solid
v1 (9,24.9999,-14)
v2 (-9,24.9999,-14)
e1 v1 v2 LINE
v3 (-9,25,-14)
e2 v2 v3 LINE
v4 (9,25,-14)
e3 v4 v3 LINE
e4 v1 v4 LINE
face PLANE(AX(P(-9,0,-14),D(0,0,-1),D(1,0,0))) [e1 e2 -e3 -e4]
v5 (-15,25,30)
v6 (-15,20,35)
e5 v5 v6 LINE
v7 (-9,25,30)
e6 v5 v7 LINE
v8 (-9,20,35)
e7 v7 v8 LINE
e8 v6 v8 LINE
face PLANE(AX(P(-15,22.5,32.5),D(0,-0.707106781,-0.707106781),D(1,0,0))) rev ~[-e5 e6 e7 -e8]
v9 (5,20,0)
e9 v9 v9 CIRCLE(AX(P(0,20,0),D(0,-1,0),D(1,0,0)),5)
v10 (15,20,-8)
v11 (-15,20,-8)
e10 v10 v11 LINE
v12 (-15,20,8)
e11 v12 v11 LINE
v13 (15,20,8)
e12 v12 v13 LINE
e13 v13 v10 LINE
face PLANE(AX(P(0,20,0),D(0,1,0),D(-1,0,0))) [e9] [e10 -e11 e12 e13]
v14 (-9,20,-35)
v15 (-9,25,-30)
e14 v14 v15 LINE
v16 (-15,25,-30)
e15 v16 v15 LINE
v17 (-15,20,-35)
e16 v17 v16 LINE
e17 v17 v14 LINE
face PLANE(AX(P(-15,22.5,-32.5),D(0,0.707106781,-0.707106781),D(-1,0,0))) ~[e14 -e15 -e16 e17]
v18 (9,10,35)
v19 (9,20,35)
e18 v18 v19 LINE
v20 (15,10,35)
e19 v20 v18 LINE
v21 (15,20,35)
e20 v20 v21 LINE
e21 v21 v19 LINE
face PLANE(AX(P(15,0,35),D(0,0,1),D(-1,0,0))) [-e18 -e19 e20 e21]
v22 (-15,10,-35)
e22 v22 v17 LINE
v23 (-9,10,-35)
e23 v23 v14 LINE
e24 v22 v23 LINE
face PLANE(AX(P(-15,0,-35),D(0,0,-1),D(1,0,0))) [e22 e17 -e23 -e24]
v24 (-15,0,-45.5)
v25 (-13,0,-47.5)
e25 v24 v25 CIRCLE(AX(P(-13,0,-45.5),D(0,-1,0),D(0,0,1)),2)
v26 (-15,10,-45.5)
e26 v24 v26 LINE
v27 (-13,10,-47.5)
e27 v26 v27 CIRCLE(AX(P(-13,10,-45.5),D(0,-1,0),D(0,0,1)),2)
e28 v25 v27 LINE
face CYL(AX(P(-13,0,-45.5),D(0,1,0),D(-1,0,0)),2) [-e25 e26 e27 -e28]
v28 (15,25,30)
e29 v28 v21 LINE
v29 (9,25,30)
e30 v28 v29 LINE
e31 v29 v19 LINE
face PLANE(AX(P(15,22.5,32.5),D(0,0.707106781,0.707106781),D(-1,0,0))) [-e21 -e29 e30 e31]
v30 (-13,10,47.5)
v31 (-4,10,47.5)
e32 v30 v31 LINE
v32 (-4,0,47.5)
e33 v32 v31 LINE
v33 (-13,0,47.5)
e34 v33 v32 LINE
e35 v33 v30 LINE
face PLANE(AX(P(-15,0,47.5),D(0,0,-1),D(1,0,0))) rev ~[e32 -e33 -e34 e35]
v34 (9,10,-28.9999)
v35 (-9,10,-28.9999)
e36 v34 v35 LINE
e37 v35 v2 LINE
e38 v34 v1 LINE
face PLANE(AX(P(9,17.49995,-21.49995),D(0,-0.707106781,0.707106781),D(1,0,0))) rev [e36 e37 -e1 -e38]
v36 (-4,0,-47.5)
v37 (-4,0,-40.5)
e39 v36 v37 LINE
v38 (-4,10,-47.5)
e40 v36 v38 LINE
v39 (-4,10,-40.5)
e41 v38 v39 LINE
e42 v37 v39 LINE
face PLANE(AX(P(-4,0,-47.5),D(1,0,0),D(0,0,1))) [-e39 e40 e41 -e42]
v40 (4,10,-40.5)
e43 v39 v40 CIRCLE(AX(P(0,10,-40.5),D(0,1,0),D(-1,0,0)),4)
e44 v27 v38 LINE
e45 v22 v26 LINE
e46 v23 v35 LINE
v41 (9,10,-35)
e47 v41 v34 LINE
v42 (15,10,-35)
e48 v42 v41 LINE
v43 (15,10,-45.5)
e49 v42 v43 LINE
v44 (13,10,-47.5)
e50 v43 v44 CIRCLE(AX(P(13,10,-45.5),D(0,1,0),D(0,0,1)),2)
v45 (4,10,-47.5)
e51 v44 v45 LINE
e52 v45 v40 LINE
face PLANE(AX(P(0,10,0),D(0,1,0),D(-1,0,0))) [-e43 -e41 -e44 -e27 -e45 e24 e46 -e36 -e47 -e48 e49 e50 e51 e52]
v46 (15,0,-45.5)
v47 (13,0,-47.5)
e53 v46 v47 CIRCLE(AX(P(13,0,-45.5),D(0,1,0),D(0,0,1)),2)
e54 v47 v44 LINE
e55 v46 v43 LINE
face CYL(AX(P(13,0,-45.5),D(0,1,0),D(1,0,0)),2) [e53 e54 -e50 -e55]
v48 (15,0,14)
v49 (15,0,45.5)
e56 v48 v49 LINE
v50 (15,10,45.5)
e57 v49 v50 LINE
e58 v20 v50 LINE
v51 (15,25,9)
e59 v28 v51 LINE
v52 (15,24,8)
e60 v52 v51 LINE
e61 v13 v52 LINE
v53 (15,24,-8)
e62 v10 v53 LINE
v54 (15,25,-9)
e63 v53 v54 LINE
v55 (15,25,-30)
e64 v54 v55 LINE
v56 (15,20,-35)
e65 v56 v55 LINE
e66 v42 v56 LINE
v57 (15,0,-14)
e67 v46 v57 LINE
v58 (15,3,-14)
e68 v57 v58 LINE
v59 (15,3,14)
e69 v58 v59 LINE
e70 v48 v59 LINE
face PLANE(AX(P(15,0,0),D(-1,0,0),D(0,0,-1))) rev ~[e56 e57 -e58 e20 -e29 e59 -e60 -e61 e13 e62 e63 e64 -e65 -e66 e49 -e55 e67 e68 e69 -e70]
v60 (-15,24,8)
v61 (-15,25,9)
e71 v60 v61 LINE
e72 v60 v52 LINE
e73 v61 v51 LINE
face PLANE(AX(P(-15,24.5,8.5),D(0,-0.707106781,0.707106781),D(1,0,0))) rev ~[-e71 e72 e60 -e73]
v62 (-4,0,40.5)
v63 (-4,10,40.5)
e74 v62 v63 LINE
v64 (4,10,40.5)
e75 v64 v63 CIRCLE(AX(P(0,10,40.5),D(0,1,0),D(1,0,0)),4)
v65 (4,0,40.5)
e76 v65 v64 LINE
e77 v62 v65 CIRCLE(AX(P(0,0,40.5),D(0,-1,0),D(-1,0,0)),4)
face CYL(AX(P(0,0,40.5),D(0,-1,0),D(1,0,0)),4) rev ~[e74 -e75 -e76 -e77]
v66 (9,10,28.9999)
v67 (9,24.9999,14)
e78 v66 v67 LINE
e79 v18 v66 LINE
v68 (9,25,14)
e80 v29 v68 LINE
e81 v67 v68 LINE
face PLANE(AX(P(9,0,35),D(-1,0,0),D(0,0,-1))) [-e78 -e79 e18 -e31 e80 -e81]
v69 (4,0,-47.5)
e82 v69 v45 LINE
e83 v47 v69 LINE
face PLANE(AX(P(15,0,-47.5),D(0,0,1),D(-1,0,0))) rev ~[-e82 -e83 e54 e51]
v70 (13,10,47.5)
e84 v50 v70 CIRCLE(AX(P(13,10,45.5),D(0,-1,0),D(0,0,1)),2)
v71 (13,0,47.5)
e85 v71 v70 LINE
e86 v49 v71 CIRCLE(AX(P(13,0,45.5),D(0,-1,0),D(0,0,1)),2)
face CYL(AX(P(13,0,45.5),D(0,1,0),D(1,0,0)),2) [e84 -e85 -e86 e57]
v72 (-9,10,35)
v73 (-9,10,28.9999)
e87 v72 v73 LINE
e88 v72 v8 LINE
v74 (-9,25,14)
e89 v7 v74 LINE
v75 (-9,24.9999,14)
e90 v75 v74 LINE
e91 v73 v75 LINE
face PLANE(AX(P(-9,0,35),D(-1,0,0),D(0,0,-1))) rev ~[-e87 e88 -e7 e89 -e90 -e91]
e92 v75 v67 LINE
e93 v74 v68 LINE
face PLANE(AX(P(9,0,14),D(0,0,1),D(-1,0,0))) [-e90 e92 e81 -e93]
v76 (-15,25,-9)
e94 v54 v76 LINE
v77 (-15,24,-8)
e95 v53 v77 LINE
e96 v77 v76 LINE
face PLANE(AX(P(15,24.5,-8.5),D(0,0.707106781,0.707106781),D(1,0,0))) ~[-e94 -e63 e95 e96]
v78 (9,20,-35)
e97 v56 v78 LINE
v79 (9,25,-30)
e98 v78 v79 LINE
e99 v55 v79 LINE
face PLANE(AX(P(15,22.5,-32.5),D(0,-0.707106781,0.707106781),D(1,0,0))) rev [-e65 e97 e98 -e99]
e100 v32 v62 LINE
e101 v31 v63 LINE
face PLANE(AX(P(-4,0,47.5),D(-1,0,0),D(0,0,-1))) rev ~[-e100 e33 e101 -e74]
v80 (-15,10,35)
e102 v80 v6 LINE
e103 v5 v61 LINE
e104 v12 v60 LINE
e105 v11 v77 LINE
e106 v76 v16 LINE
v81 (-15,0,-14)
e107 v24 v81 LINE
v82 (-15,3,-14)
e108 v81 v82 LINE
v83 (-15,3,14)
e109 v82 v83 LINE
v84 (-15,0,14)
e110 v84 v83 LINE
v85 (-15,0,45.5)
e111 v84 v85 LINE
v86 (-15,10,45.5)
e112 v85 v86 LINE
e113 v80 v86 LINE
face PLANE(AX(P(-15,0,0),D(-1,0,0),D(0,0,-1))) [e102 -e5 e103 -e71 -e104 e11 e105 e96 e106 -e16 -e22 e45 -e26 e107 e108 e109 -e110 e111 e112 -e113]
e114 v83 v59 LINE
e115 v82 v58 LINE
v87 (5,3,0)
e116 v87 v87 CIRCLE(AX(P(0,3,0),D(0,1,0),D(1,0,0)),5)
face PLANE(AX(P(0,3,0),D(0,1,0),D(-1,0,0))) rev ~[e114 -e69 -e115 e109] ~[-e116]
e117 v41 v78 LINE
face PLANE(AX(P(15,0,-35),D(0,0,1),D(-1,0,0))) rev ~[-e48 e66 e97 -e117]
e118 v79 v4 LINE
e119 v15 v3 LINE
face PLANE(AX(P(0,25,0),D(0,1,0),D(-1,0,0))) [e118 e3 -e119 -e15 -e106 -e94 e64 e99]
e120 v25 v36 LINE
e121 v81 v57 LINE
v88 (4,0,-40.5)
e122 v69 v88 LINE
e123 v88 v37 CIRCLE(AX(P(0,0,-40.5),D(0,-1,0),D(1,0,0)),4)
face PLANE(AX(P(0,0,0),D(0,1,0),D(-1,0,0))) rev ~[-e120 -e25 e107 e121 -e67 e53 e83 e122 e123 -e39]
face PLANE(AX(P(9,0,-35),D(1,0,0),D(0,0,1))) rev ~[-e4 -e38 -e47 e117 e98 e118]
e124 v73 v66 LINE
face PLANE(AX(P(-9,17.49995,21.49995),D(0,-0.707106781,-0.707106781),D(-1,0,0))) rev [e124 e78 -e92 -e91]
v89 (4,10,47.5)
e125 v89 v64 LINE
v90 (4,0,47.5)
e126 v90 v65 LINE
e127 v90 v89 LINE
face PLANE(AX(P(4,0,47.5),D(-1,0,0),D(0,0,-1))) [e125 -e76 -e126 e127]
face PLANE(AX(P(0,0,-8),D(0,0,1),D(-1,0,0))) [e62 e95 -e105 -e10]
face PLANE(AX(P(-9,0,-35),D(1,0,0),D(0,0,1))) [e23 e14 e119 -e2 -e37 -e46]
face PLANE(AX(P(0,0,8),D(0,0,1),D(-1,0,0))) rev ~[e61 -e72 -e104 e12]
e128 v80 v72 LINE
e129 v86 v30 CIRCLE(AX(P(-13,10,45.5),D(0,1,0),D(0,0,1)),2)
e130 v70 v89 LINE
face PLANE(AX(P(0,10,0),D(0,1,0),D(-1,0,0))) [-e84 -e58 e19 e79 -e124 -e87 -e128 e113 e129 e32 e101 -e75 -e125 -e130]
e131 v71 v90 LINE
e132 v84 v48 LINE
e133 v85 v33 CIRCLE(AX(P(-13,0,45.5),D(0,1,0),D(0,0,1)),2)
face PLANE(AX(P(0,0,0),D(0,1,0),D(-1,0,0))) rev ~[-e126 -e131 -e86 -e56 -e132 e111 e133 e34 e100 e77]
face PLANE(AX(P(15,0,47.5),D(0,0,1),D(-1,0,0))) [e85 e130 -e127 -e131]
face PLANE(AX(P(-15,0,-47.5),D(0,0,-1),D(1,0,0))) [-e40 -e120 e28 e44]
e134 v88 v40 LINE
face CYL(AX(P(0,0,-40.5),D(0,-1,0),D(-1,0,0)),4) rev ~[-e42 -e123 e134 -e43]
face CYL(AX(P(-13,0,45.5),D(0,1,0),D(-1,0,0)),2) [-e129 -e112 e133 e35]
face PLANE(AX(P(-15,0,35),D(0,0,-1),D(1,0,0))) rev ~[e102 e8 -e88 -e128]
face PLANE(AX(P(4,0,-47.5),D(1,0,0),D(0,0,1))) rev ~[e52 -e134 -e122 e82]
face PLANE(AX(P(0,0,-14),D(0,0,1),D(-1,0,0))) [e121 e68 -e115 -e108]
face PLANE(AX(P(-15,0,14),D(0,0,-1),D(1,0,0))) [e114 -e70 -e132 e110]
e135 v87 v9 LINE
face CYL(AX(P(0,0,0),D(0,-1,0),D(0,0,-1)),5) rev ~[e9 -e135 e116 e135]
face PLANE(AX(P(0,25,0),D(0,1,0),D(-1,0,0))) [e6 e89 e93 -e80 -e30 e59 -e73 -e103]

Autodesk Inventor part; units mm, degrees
ref_plane "YZ Plane" through (0, 0, 0) normal (1, 0, 0) x (0, 1, 0)
ref_plane "XZ Plane" through (0, 0, 0) normal (0, 1, 0) x (-1, 0, 0)
ref_plane "XY Plane" through (0, 0, 0) normal (0, 0, 1) x (1, 0, 0)
sketch "Schizzo1" plane through (0, 0, 0) normal (0, 1, 0) x (-1, 0, 0)
  line L0 (0, 0) -> (15, 0) construction
  line L1 (15, 0) -> (15, -47.5)
  line L2 (15, -47.5) -> (4, -47.5)
  line L3 (4, -47.5) -> (4, -40.5)
  line L4 (0, 0) -> (0, -36.5) construction
  arc A0 (4, -40.5) -> (0, -36.5) centre (0, -40.5) ccw
  arc A1 (0, -5) -> (5, 0) centre (0, 0) ccw
  line L5 (0, 0) -> (0, -8) construction
  line L6 (0, -8) -> (15, -8)
  line L7 (15, 0) -> (15, -14)
  line L8 (15, -14) -> (0, -14)
  line L9 (15, -35) -> (9, -35)
  line L10 (9, -35) -> (9, -14)
  line L11 (0, 0) -> (-15, 0) construction
  line L12 (-15, 0) -> (-15, -47.5)
  line L13 (-15, -47.5) -> (-4, -47.5)
  line L14 (-4, -47.5) -> (-4, -40.5)
  arc A2 (0, -36.5) -> (-4, -40.5) centre (0, -40.5) ccw
  arc A3 (-5, 0) -> (0, -5) centre (0, 0) ccw
  line L15 (0, -8) -> (-15, -8)
  line L16 (-15, 0) -> (-15, -14)
  line L17 (-15, -14) -> (0, -14)
  line L18 (-15, -35) -> (-9, -35)
  line L19 (-9, -35) -> (-9, -14)
  line L20 (15, 0) -> (15, 47.5)
  line L21 (15, 47.5) -> (4, 47.5)
  line L22 (4, 47.5) -> (4, 40.5)
  line L23 (0, 0) -> (0, 36.5) construction
  arc A4 (0, 36.5) -> (4, 40.5) centre (0, 40.5) ccw
  arc A5 (5, 0) -> (0, 5) centre (0, 0) ccw
  line L24 (0, 0) -> (0, 8) construction
  line L25 (0, 8) -> (15, 8)
  line L26 (15, 0) -> (15, 14)
  line L27 (15, 14) -> (0, 14)
  line L28 (15, 35) -> (9, 35)
  line L29 (9, 35) -> (9, 14)
  arc A6 (-4, 40.5) -> (0, 36.5) centre (0, 40.5) ccw
  line L30 (-15, 47.5) -> (-4, 47.5)
  line L31 (-4, 47.5) -> (-4, 40.5)
  line L32 (-15, 35) -> (-9, 35)
  line L33 (-15, 14) -> (0, 14)
  line L34 (-9, 35) -> (-9, 14)
  line L35 (-15, 0) -> (-15, 47.5)
  line L36 (0, 8) -> (-15, 8)
  arc A7 (0, 5) -> (-5, 0) centre (0, 0) ccw
  line L37 (-15, 0) -> (-15, 14)
  dimension "d0" = 15
  dimension "d1" = 47.5
  dimension "d2" = 11
  dimension "d5" = 5
  dimension "d6" = 8
  dimension "d7" = 14
  dimension "d8" = 6
extrude "Estrusione1" add sketch "Schizzo1" along normal blind 10 contours L1 L2 L3 A0 A2 L14 L13 L12 L18 L19 L17 L8 L10 L9 | L28 L29 L27 L33 L34 L32 L35 L30 L31 A6 A4 L22 L21 L20
extrude "Estrusione2" add sketch "Schizzo1" along normal blind 25 contours L1 L8 L17 L12 L15 L6 | L25 L36 L35 L33 L27 L20 | L1 L9 L10 L8 | L27 L29 L28 L20 | L17 L19 L18 L12 | L35 L32 L34 L33
extrude "Estrusione3" add sketch "Schizzo1" along normal blind 20 contours L1 L6 L15 L12 L35 L36 L25 L20
sketch "Schizzo1 outline for Estrusione4" plane through (0, 0, 0) normal (0, 1, 0) x (-1, 0, 0)
  line L0 (-15, 0) -> (-15, -14)
  line L1 (-15, 14) -> (-15, 0)
  line L2 (-15, -14) -> (0, -14)
  line L3 (0, 14) -> (-15, 14)
  line L4 (0, -14) -> (15, -14)
  line L5 (15, 14) -> (0, 14)
  line L6 (15, -14) -> (15, 0)
  line L7 (15, 0) -> (15, 14)
  arc A0 (0, -5) -> (-5, 0) centre (0, 0) cw
  arc A1 (5, 0) -> (0, -5) centre (0, 0) cw
  arc A2 (0, 5) -> (5, 0) centre (0, 0) cw
  arc A3 (-5, 0) -> (0, 5) centre (0, 0) cw
extrude "Estrusione4" cut sketch "Schizzo1 outline for Estrusione4" along normal blind 3
chamfer "Smusso1" distance 15 angle 45 1 edges at (0, 10, 14) measured on face at (-3, 15, 14)
chamfer "Smusso2" distance 15 angle 45 1 edges at (0, 10, -14) measured on face at (3, 15, -14)
chamfer "Smusso3" distance 5 angle 45 2 edges at (-12, 25, -35) (12, 25, -35) measured on face at (3, 25, -10)
chamfer "Smusso4" distance 5 angle 45 2 edges at (12, 25, 35) (-12, 25, 35) measured on face at (-3, 25, 10)
fillet "Raccordo1" radius 2 4 edges at (-15, 5, -47.5) (-15, 5, 47.5) (15, 5, 47.5) (15, 5, -47.5)
chamfer "Smusso5" distance 1 angle 45 1 edges at (0, 25, -8) measured on face at (-3, 25, -10)
chamfer "Smusso6" distance 1 angle 45 1 edges at (0, 25, 8) measured on face at (-3, 25, 10)
properties part number "esercizio 040.30 03-02-2023"
